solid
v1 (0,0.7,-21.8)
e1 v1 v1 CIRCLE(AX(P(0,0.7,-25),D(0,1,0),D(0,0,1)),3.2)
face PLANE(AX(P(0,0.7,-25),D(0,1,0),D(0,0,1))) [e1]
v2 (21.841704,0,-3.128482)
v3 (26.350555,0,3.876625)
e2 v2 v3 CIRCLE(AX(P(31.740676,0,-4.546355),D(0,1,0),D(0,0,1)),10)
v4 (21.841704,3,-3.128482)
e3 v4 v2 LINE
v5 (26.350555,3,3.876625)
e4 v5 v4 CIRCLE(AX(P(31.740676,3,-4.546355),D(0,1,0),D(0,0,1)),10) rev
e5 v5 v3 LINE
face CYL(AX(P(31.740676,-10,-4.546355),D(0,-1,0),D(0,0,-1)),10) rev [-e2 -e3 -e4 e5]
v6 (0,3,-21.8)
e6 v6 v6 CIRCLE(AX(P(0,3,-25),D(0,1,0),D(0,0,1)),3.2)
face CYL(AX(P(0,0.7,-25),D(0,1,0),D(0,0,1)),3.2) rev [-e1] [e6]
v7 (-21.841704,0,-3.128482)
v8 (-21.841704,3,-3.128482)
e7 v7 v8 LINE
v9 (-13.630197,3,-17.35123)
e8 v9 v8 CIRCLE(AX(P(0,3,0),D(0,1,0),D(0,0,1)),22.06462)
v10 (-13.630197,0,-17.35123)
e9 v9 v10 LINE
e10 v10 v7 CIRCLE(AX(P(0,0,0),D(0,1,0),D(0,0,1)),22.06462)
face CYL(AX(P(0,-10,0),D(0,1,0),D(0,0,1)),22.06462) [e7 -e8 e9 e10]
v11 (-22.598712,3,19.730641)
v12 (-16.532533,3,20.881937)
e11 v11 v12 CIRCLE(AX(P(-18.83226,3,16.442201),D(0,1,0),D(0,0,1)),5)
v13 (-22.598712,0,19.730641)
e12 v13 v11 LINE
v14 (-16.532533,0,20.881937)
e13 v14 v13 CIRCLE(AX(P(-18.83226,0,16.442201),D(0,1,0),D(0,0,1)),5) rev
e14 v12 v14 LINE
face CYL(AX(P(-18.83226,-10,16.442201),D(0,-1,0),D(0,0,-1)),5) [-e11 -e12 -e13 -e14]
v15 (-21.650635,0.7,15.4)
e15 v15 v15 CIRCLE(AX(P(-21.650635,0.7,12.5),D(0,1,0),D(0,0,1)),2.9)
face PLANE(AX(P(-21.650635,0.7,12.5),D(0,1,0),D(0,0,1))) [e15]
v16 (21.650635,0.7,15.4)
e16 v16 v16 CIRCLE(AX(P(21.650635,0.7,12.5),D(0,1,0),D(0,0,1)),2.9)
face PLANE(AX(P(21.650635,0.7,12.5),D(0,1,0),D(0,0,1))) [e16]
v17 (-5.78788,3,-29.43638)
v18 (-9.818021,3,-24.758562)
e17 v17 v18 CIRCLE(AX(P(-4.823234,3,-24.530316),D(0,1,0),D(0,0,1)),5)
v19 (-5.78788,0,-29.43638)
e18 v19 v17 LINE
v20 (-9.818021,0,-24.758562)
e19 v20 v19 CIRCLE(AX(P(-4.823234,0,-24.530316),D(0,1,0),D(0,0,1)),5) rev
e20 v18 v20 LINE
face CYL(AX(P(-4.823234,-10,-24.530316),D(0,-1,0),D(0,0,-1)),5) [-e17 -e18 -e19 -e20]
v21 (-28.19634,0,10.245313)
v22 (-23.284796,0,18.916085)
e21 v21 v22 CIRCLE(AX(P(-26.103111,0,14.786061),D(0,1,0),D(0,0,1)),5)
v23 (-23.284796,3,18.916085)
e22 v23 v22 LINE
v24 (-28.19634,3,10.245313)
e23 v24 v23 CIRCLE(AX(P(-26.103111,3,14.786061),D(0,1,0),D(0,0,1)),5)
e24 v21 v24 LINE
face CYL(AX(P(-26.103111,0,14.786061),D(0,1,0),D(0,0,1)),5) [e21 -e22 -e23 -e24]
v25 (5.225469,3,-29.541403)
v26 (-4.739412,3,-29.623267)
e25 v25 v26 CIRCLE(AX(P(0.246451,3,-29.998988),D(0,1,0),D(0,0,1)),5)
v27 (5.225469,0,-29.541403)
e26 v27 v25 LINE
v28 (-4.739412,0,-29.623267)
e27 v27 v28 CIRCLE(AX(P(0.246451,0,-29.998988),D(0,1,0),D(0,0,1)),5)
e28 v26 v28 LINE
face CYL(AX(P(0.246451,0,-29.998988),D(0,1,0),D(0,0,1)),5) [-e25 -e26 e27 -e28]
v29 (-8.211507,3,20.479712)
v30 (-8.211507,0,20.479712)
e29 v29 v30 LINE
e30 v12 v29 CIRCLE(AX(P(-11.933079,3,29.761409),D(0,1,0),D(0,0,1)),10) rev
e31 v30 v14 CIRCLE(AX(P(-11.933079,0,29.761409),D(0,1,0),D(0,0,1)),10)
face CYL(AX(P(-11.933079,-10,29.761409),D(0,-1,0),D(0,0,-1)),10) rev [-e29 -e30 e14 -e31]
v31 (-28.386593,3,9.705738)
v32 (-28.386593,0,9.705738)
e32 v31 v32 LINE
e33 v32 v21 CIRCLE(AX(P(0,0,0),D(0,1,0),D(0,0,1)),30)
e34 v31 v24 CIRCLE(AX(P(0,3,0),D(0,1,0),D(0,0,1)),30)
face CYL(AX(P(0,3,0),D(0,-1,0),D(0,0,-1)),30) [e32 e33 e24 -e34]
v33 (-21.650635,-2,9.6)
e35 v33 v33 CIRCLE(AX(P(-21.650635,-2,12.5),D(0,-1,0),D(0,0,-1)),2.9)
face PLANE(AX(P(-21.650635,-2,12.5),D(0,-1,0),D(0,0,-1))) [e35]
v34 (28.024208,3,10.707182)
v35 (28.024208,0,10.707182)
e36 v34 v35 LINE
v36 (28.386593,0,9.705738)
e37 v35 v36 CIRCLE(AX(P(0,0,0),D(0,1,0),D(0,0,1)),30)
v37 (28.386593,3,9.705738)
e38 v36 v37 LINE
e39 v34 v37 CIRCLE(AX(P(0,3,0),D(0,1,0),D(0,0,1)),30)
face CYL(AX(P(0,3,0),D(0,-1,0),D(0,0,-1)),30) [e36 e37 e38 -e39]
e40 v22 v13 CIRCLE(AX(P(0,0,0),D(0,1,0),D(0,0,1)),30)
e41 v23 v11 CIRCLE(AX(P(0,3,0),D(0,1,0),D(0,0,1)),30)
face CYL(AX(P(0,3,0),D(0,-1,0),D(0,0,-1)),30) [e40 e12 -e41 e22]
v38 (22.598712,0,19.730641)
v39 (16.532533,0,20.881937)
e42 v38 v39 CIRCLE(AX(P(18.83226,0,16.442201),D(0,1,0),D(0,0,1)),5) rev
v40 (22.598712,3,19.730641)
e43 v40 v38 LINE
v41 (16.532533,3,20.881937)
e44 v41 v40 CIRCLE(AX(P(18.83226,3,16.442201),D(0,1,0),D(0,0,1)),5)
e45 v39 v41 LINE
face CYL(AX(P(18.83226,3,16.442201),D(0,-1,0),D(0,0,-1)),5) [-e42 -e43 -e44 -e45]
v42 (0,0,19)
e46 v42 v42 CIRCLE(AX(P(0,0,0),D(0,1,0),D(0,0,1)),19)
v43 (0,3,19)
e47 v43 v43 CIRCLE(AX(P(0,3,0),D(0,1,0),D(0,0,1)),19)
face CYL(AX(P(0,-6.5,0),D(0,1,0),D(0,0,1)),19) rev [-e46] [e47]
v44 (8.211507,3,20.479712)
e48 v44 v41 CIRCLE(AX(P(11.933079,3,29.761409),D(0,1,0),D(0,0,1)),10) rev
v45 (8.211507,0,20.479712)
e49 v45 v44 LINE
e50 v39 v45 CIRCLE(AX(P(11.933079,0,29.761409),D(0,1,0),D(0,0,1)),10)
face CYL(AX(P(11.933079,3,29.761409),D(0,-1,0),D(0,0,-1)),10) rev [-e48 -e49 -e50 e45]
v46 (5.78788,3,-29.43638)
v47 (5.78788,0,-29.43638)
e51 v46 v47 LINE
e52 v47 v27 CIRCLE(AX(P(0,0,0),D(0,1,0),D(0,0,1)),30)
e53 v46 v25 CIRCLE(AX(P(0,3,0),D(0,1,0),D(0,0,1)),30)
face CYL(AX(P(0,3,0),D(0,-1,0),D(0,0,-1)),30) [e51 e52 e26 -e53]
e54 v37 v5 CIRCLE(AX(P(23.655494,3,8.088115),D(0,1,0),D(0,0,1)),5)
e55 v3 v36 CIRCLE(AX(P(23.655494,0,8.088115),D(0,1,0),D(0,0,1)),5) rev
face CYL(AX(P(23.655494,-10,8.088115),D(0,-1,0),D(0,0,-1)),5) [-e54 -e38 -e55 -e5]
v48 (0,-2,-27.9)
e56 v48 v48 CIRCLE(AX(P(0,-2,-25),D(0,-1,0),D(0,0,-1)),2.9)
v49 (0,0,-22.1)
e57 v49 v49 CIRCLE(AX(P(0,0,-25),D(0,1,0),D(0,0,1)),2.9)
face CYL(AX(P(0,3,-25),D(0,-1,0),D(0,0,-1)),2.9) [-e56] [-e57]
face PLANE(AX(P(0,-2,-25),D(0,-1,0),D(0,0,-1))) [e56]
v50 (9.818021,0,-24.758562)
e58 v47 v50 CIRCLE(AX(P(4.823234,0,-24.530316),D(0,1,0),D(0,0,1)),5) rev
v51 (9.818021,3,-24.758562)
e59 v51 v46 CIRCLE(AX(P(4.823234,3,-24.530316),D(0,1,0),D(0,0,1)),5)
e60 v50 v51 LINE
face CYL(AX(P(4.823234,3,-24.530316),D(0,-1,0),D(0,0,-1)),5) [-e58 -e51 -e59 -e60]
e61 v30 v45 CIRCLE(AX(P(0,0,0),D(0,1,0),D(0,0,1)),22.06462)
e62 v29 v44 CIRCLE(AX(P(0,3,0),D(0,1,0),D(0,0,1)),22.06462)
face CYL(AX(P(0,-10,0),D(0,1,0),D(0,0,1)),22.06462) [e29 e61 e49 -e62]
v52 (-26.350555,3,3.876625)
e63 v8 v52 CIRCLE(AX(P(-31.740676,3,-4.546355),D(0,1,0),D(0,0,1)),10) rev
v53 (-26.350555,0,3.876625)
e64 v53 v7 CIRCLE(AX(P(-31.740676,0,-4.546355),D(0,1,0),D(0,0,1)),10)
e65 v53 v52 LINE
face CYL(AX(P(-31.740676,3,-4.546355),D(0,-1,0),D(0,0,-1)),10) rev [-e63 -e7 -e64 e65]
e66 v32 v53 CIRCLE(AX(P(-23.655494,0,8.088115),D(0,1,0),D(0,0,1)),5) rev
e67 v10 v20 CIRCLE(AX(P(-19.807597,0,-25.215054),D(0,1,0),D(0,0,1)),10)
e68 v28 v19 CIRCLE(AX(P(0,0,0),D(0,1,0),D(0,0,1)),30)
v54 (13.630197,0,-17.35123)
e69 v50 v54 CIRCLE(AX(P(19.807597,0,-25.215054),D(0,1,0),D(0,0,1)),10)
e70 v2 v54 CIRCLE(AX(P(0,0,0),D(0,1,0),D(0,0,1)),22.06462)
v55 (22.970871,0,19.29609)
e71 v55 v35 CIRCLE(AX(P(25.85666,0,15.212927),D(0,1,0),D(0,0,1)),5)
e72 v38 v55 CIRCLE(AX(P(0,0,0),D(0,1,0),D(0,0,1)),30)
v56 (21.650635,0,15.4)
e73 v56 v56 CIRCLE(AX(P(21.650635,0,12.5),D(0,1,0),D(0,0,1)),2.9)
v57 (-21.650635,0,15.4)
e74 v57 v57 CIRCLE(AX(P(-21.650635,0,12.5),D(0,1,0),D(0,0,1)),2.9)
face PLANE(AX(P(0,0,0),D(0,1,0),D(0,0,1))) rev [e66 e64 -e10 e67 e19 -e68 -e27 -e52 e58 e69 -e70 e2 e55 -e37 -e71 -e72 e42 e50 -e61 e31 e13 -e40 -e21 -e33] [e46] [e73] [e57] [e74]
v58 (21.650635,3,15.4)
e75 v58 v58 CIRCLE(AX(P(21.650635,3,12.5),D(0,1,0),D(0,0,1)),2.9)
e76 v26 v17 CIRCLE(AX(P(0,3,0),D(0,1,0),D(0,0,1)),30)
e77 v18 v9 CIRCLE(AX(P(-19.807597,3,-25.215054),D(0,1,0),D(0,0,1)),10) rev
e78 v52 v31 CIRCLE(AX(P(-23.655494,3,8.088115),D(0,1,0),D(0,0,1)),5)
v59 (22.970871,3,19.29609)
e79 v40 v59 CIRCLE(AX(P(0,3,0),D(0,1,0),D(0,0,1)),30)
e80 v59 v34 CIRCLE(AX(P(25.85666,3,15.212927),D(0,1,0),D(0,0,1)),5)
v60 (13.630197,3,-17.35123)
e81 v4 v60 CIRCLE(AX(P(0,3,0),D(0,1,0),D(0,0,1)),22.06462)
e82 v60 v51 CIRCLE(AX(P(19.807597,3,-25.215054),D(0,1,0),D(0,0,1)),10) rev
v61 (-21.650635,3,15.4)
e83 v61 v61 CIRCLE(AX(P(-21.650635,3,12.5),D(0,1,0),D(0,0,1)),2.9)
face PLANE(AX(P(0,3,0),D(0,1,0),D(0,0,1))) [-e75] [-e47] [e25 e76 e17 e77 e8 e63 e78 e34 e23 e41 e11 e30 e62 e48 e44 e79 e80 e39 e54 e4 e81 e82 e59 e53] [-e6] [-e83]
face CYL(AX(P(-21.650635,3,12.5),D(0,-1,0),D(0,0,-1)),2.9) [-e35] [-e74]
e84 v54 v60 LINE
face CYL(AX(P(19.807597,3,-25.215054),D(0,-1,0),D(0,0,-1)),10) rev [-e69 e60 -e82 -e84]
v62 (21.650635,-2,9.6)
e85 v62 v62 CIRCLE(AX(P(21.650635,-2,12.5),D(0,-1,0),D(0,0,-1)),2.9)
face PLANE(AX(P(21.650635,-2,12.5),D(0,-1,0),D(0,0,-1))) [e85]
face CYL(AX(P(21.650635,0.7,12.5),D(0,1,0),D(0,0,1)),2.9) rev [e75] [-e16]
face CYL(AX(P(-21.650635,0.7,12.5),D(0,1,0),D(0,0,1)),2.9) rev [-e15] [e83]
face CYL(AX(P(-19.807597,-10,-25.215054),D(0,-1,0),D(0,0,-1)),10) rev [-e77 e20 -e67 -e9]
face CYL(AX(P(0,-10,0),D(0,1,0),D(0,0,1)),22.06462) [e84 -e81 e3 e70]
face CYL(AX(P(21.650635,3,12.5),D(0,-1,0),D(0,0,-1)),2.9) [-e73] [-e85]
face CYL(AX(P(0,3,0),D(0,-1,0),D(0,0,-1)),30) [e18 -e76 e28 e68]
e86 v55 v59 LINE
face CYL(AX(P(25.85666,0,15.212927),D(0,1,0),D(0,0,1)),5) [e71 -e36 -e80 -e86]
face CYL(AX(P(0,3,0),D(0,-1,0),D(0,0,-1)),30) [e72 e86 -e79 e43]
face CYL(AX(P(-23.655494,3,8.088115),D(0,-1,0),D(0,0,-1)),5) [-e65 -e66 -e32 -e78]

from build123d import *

# Parameters (mm, degrees)
SKETCH1_R                = 19
BOSS_EXTRUDE1_DEPTH      = 3.5
SKETCH2_R                = 30
SKETCH2_R_2              = 19
SKETCH2_R_3              = 2.8
BOSS_EXTRUDE2_DEPTH      = 3
BOSS_EXTRUDE3_DEPTH      = 2
BOSS_EXTRUDE3_DEPTH_BACK = 3
SKETCH4_R                = 2.9
SKETCH5_R                = 5
BOSS_EXTRUDE4_DEPTH      = 3
CUT_EXTRUDE1_START       = -10
SKETCH3_R                = 19
CUT_EXTRUDE1_DEPTH       = 10
SKETCH6_R                = 3.2
SKETCH6_R_2              = 2.9
CUT_EXTRUDE2_DEPTH       = 2.3
CUT_EXTRUDE3_START       = -13
CUT_EXTRUDE3_DEPTH       = 13
FILLET1_R                = 10
FILLET2_R                = 5


with BuildPart() as part:
    # Sketch1 → Boss-Extrude1 (new body)
    with BuildSketch(Plane(origin=(0, 0, 0), x_dir=(1, 0, 0), z_dir=(0, 1, 0))):
        with Locations(Location((0, 0, 0), (0, 0, 270))):
            Circle(SKETCH1_R)
    extrude(amount=BOSS_EXTRUDE1_DEPTH)

    # Sketch2 → Boss-Extrude2 (add)
    with BuildSketch(Plane(origin=(0, 0, 0), x_dir=(1, 0, 0), z_dir=(0, 1, 0))):
        with Locations(Location((0, 0, 0), (0, 0, 270))):
            Circle(SKETCH2_R)
        with Locations(Location((0, 0, 0), (0, 0, 270))):
            Circle(SKETCH2_R_2, mode=Mode.SUBTRACT)
        with Locations(Location((0, 25, 0), (0, 0, 270))):
            Circle(SKETCH2_R_3, mode=Mode.SUBTRACT)
        with Locations(Location((21.650635095, -12.5, 0), (0, 0, 270))):
            Circle(SKETCH2_R_3, mode=Mode.SUBTRACT)
        with Locations(Location((-21.650635095, -12.5, 0), (0, 0, 270))):
            Circle(SKETCH2_R_3, mode=Mode.SUBTRACT)
    extrude(amount=BOSS_EXTRUDE2_DEPTH)

    # Sketch4 → Boss-Extrude3 (add, two sides: drawn at the far end of the back side and taken through both)
    with BuildSketch(Plane.XZ.offset(-BOSS_EXTRUDE3_DEPTH_BACK)):
        with Locations(Location((-21.650635095, 12.5, 0), (0, 0, 270))):
            Circle(SKETCH4_R)
        with Locations(Location((21.650635095, 12.5, 0), (0, 0, 270))):
            Circle(SKETCH4_R)
        with Locations(Location((0, -25, 0), (0, 0, 270))):
            Circle(SKETCH4_R)
    extrude(amount=BOSS_EXTRUDE3_DEPTH + BOSS_EXTRUDE3_DEPTH_BACK)

    # Sketch5 → Boss-Extrude4 (add)
    with BuildSketch(Plane(origin=(0, 3, 0), x_dir=(1, 0, 0), z_dir=(0, 1, 0))):
        with Locations((-26.103110985, -14.7860609)):
            Circle(SKETCH5_R)
        with Locations((0.246451131, 29.99898768)):
            Circle(SKETCH5_R)
        with Locations((25.856659853, -15.212926781)):
            Circle(SKETCH5_R)
    extrude(amount=-BOSS_EXTRUDE4_DEPTH)

    # Sketch3 → Cut-Extrude1 (cut)
    with BuildSketch(Plane(origin=(0, 3.5, 0), x_dir=(1, 0, 0), z_dir=(0, 1, 0)).offset(CUT_EXTRUDE1_START)):
        with Locations(Location((0, 0, 0), (0, 0, 270))):
            Circle(SKETCH3_R)
    extrude(amount=CUT_EXTRUDE1_DEPTH, mode=Mode.SUBTRACT)

    # Sketch6 → Cut-Extrude2 (cut)
    with BuildSketch(Plane(origin=(0, 3, 0), x_dir=(1, 0, 0), z_dir=(0, 1, 0))):
        with Locations(Location((0, 25, 0), (0, 0, 270))):
            Circle(SKETCH6_R)
        with Locations(Location((21.650635095, -12.5, 0), (0, 0, 90))):
            Circle(SKETCH6_R_2)
        with Locations(Location((-21.650635095, -12.5, 0), (0, 0, 90))):
            Circle(SKETCH6_R_2)
    extrude(amount=-CUT_EXTRUDE2_DEPTH, mode=Mode.SUBTRACT)

    # Sketch7 → Cut-Extrude3 (cut)
    with BuildSketch(Plane(origin=(0, 3, 0), x_dir=(1, 0, 0), z_dir=(0, 1, 0)).offset(CUT_EXTRUDE3_START)):
        with BuildLine():
            ThreePointArc((-29.54423259, -5.20944533), (-25.980762114, 15), (-10.2606043, 28.190778624))
            Line((-10.2606043, 28.190778624), (-13.773984089, 37.84371026))
            Line((-13.773984089, 37.84371026), (-43.939319858, -7.747687605))
            Line((-43.939319858, -7.747687605), (-29.54423259, -5.20944533))
        make_face()
        with BuildLine():
            ThreePointArc((-21.729408673, -3.831481024), (-19.108521295, 11.032309914), (-7.546544436, 20.733960432))
            Line((-7.546544436, 20.733960432), (-10.2606043, 28.190778624))
            ThreePointArc((-10.2606043, 28.190778624), (-25.980762114, 15), (-29.54423259, -5.20944533))
            Line((-29.54423259, -5.20944533), (-21.729408673, -3.831481024))
        make_face()
        with BuildLine():
            Line((15.259965643, 41.926411025), (10.2606043, 28.190778624))
            ThreePointArc((10.2606043, 28.190778624), (25.980762114, 15), (29.54423259, -5.20944533))
            Line((29.54423259, -5.20944533), (39.660606503, -6.993234998))
            Line((39.660606503, -6.993234998), (15.259965643, 41.926411025))
        make_face()
        with BuildLine():
            Line((10.2606043, 28.190778624), (7.546544436, 20.733960432))
            ThreePointArc((7.546544436, 20.733960432), (18.074278438, 12.65574601), (22.064619828, 0))
            ThreePointArc((22.064619828, 0), (21.980657288, -1.92305833), (21.729408673, -3.831481024))
            Line((21.729408673, -3.831481024), (29.54423259, -5.20944533))
            ThreePointArc((29.54423259, -5.20944533), (25.980762114, 15), (10.2606043, 28.190778624))
        make_face()
        with BuildLine():
            Line((28.679354216, -34.17872342), (19.283628291, -22.981333294))
            ThreePointArc((19.283628291, -22.981333294), (0, -30), (-19.283628291, -22.981333294))
            Line((-19.283628291, -22.981333294), (-25.886622414, -30.850475262))
            Line((-25.886622414, -30.850475262), (28.679354216, -34.17872342))
        make_face()
        with BuildLine():
            Line((19.283628291, -22.981333294), (14.182864238, -16.902479408))
            ThreePointArc((14.182864238, -16.902479408), (0, -22.064619828), (-14.182864238, -16.902479408))
            Line((-14.182864238, -16.902479408), (-19.283628291, -22.981333294))
            ThreePointArc((-19.283628291, -22.981333294), (0, -30), (19.283628291, -22.981333294))
        make_face()
    extrude(amount=CUT_EXTRUDE3_DEPTH, mode=Mode.SUBTRACT)

    # Fillet1
    # the kernel refuses this fillet: 10 mm, written as the material it adds along each edge
    with BuildSketch(Plane(origin=(-21.729408673, 0, 3.831481024), x_dir=(-0.9848077530122133, 0, 0.17364817766690055), z_dir=(0, 1, 0)), Plane(origin=(14.182864238, 0, 16.902479408), x_dir=(0.6427876096865253, 0, 0.7660444431189899), z_dir=(0, 1, 0)), Plane(origin=(7.546544436, 0, -20.733960432), x_dir=(0.34202014332569675, 0, -0.9396926207858982), z_dir=(0, 1, 0))) as fillet1_piece_1:
        with BuildLine():
            CenterArc((8.404377584, -9.988996017), FILLET1_R, 92.688143309, 69.160575724)
            Line((-1.097995304, -6.873725644), (-1.288042762, -6.811420237))
            ThreePointArc((-1.288042762, -6.811420237), (-0.473724072, -3.448886874), (-0.2, 0))
            Line((-0.2, 0), (0, 0.2))
            ThreePointArc((0, 0.2), (3.967690086, 0.2), (7.926000224, 0.19977992))
            Line((7.926000224, 0.19977992), (7.935380172, 0))
        make_face()
    extrude(amount=3)
    with BuildSketch(Plane(origin=(-14.182864238, 0, 16.902479408), x_dir=(0.8578464941811706, 0, 0.5139060151633514), z_dir=(0, 1, 0)), Plane(origin=(21.729408673, 0, 3.831481024), x_dir=(0.01613241719851076, 0, -0.9998698640899891), z_dir=(0, 1, 0)), Plane(origin=(-7.546544436, 0, -20.733960432), x_dir=(-0.8739789113796794, 0, 0.48596384892663586), z_dir=(0, 1, 0))) as fillet1_piece_2:
        with BuildLine():
            CenterArc((8.538251552, -9.87480959), FILLET1_R, 99.075640483, 69.160575724)
            Line((-1.251712984, -7.836036823), (-1.447512274, -7.795261367))
            ThreePointArc((-1.447512274, -7.795261367), (-0.823352684, -3.886470761), (-0.197496192, 0.03154765))
            Line((-0.197496192, 0.03154765), (0.03154765, 0.197496192))
            ThreePointArc((0.03154765, 0.197496192), (3.480434524, -0.07622788), (6.929321399, 0.197496192))
            Line((6.929321399, 0.197496192), (6.960869049, 0))
        make_face()
    extrude(amount=3)

    # Fillet2
    fillet2_edges = [part.edges().sort_by_distance(p)[0] for p in [
        (-19.283628291, 1.5, 22.981333294),
        (19.283628291, 1.5, 22.981333294),
        (29.54423259, 1.5, 5.20944533),
        (10.2606043, 1.5, -28.190778624),
        (-10.2606043, 1.5, -28.190778624),
        (-29.54423259, 1.5, 5.20944533),
    ]]
    fillet(fillet2_edges, radius=FILLET2_R)


solid = part.part
